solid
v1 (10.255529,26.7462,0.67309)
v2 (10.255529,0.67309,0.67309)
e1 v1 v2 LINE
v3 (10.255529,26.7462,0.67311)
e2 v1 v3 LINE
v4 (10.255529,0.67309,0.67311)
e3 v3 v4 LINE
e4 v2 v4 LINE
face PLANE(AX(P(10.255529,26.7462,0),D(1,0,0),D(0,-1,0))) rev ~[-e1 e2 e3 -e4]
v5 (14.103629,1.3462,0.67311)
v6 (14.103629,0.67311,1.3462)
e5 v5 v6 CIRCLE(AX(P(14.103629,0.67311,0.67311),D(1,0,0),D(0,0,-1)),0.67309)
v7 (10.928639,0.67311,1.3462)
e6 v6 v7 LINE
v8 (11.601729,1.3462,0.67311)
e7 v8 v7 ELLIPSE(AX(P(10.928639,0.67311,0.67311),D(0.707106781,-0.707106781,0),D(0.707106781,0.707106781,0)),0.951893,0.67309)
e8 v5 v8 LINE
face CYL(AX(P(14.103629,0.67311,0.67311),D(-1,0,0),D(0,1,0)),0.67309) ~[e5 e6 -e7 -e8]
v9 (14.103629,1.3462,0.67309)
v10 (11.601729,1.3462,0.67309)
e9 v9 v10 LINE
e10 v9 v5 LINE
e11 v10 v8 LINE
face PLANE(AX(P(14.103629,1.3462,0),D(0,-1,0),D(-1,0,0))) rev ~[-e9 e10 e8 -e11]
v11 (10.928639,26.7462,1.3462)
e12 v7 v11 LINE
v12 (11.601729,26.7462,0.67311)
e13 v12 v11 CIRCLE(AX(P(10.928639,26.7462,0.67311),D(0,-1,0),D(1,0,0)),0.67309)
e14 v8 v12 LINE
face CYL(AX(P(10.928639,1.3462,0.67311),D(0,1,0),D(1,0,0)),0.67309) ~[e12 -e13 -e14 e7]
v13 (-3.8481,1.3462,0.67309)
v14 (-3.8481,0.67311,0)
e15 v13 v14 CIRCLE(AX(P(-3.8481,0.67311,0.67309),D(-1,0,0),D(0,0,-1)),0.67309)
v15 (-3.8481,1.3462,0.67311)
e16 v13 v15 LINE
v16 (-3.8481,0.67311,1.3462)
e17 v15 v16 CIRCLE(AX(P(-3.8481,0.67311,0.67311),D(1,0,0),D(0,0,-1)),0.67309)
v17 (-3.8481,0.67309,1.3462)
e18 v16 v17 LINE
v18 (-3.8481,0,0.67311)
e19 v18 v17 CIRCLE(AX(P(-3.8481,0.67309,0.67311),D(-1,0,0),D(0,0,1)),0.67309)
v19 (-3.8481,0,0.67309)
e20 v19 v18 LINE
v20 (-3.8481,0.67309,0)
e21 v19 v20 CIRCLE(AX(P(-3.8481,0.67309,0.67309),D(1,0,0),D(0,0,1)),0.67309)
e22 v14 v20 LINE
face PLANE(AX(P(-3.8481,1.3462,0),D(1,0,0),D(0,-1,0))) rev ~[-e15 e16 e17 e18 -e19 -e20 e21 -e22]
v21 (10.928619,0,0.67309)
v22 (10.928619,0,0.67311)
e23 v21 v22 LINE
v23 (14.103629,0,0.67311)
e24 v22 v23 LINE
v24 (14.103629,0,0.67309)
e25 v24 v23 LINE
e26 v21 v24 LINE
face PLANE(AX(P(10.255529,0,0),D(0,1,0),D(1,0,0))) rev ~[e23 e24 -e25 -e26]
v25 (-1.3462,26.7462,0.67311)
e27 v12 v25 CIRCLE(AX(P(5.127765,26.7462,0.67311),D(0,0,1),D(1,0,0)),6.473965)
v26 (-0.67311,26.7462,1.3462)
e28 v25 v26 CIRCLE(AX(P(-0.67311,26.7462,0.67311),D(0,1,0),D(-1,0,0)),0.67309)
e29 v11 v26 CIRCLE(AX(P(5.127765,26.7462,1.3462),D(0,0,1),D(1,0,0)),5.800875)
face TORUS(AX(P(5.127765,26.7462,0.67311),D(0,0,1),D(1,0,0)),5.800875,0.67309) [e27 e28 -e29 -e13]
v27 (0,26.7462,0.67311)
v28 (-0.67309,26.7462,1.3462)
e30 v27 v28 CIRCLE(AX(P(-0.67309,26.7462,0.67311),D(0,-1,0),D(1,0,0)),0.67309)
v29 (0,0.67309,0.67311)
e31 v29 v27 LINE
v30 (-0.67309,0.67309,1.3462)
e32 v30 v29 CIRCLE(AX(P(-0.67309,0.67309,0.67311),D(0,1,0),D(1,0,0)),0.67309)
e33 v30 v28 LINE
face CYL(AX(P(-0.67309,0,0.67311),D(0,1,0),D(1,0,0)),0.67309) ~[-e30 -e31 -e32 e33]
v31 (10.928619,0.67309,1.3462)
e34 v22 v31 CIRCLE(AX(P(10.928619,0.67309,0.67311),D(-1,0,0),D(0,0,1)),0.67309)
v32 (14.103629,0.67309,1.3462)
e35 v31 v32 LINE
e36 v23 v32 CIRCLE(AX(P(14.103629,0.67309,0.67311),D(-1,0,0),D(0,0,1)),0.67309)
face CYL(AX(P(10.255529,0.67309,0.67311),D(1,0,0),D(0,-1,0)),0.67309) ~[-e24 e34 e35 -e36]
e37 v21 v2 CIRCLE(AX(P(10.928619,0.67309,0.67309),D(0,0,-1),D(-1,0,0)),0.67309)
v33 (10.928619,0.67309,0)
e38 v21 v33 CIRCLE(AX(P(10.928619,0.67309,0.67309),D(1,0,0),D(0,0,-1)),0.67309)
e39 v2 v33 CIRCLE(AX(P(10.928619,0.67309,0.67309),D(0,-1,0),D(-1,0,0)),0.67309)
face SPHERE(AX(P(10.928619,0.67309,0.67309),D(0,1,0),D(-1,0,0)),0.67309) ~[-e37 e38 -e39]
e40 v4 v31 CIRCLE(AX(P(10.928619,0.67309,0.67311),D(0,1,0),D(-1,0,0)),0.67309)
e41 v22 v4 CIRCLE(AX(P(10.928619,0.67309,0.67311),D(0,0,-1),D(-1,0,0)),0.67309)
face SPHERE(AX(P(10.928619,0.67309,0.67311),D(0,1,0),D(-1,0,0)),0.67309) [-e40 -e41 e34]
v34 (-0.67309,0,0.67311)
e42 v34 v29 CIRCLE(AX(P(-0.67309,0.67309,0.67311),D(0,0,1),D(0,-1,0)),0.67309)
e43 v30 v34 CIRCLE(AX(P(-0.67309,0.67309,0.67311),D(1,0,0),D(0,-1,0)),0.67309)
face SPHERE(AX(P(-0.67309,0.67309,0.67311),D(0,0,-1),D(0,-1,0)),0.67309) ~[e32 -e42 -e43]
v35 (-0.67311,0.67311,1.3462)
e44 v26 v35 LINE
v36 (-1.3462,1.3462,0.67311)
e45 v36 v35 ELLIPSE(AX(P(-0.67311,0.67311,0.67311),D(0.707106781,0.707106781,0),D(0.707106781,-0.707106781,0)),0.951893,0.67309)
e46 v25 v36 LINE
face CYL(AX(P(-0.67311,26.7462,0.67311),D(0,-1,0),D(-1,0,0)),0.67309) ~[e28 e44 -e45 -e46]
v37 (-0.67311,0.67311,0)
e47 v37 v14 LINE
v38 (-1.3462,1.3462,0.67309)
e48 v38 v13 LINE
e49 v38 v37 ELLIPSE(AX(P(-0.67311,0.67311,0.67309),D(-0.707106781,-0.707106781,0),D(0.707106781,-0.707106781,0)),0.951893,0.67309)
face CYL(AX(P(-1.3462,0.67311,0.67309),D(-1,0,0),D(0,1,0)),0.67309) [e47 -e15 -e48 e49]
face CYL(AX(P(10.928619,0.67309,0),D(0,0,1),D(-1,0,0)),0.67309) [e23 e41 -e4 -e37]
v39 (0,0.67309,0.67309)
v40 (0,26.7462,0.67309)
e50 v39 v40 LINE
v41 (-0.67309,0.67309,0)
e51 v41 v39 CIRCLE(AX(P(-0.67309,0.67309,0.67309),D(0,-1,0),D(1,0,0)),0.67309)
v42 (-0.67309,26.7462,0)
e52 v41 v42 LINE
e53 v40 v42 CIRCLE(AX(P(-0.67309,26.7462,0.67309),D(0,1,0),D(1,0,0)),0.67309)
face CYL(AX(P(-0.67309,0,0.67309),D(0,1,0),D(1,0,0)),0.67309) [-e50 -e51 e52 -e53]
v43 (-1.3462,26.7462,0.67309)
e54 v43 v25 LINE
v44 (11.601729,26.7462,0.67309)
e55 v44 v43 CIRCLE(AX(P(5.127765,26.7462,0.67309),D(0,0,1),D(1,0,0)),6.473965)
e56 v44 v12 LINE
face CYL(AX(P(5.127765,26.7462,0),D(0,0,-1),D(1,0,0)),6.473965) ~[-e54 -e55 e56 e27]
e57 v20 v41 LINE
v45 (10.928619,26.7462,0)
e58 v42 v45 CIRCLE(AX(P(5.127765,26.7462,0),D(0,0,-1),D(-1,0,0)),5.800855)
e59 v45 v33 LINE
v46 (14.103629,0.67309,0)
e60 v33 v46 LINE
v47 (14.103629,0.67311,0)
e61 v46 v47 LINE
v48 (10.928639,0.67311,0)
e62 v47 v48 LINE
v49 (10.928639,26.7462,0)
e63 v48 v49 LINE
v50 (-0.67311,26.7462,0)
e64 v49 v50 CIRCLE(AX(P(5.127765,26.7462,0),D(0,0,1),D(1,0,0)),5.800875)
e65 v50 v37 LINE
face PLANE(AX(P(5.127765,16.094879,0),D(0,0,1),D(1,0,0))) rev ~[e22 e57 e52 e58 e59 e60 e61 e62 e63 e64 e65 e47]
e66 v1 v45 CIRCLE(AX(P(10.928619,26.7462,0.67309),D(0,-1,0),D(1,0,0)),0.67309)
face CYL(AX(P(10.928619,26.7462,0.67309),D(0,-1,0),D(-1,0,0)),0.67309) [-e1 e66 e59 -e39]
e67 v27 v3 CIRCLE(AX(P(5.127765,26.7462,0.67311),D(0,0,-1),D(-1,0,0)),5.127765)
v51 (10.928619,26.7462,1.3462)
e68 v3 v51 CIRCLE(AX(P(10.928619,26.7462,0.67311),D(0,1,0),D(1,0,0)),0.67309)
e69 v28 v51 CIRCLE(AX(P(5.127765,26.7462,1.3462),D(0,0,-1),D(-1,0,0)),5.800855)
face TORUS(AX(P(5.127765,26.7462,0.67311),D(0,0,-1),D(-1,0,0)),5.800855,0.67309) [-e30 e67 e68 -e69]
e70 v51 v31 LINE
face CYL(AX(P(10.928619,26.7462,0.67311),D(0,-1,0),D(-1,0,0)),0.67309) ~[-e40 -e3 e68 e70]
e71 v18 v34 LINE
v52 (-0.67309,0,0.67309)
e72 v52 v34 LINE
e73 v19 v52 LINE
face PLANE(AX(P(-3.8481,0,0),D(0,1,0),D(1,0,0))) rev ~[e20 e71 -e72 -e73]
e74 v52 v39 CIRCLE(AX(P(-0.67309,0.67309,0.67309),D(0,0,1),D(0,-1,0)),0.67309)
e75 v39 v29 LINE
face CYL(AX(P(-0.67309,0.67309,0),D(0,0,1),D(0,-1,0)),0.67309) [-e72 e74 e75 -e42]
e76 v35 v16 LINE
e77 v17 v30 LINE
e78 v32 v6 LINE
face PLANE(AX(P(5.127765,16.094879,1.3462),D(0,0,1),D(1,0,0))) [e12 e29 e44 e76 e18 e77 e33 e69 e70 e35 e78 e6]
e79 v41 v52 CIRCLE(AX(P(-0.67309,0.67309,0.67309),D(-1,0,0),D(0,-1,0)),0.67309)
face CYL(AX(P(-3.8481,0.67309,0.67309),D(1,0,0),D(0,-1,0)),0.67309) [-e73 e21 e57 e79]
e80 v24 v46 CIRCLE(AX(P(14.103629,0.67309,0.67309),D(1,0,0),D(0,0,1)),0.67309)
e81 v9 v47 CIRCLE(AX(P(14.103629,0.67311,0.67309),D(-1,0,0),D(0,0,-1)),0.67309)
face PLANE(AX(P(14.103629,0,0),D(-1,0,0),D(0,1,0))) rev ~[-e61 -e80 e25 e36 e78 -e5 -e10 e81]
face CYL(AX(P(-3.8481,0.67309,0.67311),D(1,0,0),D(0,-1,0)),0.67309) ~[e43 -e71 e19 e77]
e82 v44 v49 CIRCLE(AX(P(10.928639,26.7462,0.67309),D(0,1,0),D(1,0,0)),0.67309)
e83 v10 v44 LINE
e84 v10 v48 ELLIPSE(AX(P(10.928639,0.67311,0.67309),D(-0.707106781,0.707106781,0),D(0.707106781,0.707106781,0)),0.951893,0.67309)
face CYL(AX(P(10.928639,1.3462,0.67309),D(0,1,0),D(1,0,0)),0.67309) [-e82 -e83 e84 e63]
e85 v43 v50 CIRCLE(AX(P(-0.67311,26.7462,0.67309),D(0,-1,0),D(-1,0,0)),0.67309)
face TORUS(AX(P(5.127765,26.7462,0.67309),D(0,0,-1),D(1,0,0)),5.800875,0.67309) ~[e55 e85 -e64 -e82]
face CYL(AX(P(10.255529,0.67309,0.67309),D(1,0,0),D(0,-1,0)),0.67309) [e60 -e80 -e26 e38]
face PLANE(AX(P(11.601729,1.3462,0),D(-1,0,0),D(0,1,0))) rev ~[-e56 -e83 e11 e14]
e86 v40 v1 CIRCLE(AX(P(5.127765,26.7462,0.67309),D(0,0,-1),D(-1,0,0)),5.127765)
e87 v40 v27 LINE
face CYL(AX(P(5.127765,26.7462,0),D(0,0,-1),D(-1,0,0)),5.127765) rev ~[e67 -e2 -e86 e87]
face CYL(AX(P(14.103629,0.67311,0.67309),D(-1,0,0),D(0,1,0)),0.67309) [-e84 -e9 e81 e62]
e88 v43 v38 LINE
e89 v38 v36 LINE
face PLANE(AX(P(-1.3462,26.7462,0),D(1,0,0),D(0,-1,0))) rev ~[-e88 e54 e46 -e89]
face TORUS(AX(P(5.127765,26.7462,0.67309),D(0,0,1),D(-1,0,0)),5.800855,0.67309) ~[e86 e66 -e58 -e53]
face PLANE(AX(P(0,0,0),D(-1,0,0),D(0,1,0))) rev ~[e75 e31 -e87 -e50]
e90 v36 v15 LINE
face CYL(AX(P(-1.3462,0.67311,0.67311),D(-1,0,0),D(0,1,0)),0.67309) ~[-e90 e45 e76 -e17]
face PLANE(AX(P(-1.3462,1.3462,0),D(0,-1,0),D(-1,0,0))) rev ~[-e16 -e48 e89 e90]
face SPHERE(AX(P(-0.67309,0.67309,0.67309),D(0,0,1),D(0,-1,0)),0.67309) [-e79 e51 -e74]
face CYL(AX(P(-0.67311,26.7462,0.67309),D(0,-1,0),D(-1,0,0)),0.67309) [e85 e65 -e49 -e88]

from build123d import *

# Parameters (mm, degrees)
F1_DEPTH = 1.3462
F2_R     = 0.67309


# Not quite as in the source:
# - a fillet or chamfer is up to 0.001 mm smaller than in the source, because OpenCascade refuses the exact size


with BuildPart() as f1:
    # F0 (on Top) → F1 (new body)
    with BuildSketch(Plane.XY):
        with BuildLine():
            Line((-3.8481, 0), (0, 0))
            Line((0, 0), (0, 26.7462))
            ThreePointArc((0, 26.7462), (5.1277647, 31.8739647), (10.2555294, 26.7462))
            Line((10.2555294, 26.7462), (10.2555294, 0))
            Line((10.2555294, 0), (14.1036294, 0))
            Line((14.1036294, 0), (14.1036294, 1.3462))
            Line((14.1036294, 1.3462), (11.6017294, 1.3462))
            Line((11.6017294, 1.3462), (11.6017294, 26.7462))
            ThreePointArc((11.6017294, 26.7462), (5.1277647, 33.2201647), (-1.3462, 26.7462))
            Line((-1.3462, 26.7462), (-1.3462, 1.3462))
            Line((-1.3462, 1.3462), (-3.8481, 1.3462))
            Line((-3.8481, 1.3462), (-3.8481, 0))
        make_face()
    extrude(amount=F1_DEPTH)

    # F2 (radius 0.6731 in the source; OpenCascade refuses exactly that, so slightly less here)
    f2_edges = [f1.edges().sort_by_distance(p)[0] for p in [
        (0, 0, 0.6731),
        (-1.92405, 0, 1.3462),
        (-1.92405, 0, 0),
        (0, 13.3731, 1.3462),
        (0, 13.3731, 0),
        (5.127765, 31.873965, 1.3462),
        (5.127765, 31.873965, 0),
        (10.255529, 13.3731, 1.3462),
        (11.601729, 14.0462, 1.3462),
        (11.601729, 14.0462, 0),
        (5.127765, 33.220165, 0),
        (5.127765, 33.220165, 1.3462),
        (10.255529, 0, 0.6731),
        (10.255529, 13.3731, 0),
        (12.179579, 0, 1.3462),
        (12.179579, 0, 0),
        (12.852679, 1.3462, 0),
        (12.852679, 1.3462, 1.3462),
        (-2.59715, 1.3462, 1.3462),
        (-2.59715, 1.3462, 0),
    ]]
    fillet(f2_edges, radius=F2_R)


solid = f1.part
